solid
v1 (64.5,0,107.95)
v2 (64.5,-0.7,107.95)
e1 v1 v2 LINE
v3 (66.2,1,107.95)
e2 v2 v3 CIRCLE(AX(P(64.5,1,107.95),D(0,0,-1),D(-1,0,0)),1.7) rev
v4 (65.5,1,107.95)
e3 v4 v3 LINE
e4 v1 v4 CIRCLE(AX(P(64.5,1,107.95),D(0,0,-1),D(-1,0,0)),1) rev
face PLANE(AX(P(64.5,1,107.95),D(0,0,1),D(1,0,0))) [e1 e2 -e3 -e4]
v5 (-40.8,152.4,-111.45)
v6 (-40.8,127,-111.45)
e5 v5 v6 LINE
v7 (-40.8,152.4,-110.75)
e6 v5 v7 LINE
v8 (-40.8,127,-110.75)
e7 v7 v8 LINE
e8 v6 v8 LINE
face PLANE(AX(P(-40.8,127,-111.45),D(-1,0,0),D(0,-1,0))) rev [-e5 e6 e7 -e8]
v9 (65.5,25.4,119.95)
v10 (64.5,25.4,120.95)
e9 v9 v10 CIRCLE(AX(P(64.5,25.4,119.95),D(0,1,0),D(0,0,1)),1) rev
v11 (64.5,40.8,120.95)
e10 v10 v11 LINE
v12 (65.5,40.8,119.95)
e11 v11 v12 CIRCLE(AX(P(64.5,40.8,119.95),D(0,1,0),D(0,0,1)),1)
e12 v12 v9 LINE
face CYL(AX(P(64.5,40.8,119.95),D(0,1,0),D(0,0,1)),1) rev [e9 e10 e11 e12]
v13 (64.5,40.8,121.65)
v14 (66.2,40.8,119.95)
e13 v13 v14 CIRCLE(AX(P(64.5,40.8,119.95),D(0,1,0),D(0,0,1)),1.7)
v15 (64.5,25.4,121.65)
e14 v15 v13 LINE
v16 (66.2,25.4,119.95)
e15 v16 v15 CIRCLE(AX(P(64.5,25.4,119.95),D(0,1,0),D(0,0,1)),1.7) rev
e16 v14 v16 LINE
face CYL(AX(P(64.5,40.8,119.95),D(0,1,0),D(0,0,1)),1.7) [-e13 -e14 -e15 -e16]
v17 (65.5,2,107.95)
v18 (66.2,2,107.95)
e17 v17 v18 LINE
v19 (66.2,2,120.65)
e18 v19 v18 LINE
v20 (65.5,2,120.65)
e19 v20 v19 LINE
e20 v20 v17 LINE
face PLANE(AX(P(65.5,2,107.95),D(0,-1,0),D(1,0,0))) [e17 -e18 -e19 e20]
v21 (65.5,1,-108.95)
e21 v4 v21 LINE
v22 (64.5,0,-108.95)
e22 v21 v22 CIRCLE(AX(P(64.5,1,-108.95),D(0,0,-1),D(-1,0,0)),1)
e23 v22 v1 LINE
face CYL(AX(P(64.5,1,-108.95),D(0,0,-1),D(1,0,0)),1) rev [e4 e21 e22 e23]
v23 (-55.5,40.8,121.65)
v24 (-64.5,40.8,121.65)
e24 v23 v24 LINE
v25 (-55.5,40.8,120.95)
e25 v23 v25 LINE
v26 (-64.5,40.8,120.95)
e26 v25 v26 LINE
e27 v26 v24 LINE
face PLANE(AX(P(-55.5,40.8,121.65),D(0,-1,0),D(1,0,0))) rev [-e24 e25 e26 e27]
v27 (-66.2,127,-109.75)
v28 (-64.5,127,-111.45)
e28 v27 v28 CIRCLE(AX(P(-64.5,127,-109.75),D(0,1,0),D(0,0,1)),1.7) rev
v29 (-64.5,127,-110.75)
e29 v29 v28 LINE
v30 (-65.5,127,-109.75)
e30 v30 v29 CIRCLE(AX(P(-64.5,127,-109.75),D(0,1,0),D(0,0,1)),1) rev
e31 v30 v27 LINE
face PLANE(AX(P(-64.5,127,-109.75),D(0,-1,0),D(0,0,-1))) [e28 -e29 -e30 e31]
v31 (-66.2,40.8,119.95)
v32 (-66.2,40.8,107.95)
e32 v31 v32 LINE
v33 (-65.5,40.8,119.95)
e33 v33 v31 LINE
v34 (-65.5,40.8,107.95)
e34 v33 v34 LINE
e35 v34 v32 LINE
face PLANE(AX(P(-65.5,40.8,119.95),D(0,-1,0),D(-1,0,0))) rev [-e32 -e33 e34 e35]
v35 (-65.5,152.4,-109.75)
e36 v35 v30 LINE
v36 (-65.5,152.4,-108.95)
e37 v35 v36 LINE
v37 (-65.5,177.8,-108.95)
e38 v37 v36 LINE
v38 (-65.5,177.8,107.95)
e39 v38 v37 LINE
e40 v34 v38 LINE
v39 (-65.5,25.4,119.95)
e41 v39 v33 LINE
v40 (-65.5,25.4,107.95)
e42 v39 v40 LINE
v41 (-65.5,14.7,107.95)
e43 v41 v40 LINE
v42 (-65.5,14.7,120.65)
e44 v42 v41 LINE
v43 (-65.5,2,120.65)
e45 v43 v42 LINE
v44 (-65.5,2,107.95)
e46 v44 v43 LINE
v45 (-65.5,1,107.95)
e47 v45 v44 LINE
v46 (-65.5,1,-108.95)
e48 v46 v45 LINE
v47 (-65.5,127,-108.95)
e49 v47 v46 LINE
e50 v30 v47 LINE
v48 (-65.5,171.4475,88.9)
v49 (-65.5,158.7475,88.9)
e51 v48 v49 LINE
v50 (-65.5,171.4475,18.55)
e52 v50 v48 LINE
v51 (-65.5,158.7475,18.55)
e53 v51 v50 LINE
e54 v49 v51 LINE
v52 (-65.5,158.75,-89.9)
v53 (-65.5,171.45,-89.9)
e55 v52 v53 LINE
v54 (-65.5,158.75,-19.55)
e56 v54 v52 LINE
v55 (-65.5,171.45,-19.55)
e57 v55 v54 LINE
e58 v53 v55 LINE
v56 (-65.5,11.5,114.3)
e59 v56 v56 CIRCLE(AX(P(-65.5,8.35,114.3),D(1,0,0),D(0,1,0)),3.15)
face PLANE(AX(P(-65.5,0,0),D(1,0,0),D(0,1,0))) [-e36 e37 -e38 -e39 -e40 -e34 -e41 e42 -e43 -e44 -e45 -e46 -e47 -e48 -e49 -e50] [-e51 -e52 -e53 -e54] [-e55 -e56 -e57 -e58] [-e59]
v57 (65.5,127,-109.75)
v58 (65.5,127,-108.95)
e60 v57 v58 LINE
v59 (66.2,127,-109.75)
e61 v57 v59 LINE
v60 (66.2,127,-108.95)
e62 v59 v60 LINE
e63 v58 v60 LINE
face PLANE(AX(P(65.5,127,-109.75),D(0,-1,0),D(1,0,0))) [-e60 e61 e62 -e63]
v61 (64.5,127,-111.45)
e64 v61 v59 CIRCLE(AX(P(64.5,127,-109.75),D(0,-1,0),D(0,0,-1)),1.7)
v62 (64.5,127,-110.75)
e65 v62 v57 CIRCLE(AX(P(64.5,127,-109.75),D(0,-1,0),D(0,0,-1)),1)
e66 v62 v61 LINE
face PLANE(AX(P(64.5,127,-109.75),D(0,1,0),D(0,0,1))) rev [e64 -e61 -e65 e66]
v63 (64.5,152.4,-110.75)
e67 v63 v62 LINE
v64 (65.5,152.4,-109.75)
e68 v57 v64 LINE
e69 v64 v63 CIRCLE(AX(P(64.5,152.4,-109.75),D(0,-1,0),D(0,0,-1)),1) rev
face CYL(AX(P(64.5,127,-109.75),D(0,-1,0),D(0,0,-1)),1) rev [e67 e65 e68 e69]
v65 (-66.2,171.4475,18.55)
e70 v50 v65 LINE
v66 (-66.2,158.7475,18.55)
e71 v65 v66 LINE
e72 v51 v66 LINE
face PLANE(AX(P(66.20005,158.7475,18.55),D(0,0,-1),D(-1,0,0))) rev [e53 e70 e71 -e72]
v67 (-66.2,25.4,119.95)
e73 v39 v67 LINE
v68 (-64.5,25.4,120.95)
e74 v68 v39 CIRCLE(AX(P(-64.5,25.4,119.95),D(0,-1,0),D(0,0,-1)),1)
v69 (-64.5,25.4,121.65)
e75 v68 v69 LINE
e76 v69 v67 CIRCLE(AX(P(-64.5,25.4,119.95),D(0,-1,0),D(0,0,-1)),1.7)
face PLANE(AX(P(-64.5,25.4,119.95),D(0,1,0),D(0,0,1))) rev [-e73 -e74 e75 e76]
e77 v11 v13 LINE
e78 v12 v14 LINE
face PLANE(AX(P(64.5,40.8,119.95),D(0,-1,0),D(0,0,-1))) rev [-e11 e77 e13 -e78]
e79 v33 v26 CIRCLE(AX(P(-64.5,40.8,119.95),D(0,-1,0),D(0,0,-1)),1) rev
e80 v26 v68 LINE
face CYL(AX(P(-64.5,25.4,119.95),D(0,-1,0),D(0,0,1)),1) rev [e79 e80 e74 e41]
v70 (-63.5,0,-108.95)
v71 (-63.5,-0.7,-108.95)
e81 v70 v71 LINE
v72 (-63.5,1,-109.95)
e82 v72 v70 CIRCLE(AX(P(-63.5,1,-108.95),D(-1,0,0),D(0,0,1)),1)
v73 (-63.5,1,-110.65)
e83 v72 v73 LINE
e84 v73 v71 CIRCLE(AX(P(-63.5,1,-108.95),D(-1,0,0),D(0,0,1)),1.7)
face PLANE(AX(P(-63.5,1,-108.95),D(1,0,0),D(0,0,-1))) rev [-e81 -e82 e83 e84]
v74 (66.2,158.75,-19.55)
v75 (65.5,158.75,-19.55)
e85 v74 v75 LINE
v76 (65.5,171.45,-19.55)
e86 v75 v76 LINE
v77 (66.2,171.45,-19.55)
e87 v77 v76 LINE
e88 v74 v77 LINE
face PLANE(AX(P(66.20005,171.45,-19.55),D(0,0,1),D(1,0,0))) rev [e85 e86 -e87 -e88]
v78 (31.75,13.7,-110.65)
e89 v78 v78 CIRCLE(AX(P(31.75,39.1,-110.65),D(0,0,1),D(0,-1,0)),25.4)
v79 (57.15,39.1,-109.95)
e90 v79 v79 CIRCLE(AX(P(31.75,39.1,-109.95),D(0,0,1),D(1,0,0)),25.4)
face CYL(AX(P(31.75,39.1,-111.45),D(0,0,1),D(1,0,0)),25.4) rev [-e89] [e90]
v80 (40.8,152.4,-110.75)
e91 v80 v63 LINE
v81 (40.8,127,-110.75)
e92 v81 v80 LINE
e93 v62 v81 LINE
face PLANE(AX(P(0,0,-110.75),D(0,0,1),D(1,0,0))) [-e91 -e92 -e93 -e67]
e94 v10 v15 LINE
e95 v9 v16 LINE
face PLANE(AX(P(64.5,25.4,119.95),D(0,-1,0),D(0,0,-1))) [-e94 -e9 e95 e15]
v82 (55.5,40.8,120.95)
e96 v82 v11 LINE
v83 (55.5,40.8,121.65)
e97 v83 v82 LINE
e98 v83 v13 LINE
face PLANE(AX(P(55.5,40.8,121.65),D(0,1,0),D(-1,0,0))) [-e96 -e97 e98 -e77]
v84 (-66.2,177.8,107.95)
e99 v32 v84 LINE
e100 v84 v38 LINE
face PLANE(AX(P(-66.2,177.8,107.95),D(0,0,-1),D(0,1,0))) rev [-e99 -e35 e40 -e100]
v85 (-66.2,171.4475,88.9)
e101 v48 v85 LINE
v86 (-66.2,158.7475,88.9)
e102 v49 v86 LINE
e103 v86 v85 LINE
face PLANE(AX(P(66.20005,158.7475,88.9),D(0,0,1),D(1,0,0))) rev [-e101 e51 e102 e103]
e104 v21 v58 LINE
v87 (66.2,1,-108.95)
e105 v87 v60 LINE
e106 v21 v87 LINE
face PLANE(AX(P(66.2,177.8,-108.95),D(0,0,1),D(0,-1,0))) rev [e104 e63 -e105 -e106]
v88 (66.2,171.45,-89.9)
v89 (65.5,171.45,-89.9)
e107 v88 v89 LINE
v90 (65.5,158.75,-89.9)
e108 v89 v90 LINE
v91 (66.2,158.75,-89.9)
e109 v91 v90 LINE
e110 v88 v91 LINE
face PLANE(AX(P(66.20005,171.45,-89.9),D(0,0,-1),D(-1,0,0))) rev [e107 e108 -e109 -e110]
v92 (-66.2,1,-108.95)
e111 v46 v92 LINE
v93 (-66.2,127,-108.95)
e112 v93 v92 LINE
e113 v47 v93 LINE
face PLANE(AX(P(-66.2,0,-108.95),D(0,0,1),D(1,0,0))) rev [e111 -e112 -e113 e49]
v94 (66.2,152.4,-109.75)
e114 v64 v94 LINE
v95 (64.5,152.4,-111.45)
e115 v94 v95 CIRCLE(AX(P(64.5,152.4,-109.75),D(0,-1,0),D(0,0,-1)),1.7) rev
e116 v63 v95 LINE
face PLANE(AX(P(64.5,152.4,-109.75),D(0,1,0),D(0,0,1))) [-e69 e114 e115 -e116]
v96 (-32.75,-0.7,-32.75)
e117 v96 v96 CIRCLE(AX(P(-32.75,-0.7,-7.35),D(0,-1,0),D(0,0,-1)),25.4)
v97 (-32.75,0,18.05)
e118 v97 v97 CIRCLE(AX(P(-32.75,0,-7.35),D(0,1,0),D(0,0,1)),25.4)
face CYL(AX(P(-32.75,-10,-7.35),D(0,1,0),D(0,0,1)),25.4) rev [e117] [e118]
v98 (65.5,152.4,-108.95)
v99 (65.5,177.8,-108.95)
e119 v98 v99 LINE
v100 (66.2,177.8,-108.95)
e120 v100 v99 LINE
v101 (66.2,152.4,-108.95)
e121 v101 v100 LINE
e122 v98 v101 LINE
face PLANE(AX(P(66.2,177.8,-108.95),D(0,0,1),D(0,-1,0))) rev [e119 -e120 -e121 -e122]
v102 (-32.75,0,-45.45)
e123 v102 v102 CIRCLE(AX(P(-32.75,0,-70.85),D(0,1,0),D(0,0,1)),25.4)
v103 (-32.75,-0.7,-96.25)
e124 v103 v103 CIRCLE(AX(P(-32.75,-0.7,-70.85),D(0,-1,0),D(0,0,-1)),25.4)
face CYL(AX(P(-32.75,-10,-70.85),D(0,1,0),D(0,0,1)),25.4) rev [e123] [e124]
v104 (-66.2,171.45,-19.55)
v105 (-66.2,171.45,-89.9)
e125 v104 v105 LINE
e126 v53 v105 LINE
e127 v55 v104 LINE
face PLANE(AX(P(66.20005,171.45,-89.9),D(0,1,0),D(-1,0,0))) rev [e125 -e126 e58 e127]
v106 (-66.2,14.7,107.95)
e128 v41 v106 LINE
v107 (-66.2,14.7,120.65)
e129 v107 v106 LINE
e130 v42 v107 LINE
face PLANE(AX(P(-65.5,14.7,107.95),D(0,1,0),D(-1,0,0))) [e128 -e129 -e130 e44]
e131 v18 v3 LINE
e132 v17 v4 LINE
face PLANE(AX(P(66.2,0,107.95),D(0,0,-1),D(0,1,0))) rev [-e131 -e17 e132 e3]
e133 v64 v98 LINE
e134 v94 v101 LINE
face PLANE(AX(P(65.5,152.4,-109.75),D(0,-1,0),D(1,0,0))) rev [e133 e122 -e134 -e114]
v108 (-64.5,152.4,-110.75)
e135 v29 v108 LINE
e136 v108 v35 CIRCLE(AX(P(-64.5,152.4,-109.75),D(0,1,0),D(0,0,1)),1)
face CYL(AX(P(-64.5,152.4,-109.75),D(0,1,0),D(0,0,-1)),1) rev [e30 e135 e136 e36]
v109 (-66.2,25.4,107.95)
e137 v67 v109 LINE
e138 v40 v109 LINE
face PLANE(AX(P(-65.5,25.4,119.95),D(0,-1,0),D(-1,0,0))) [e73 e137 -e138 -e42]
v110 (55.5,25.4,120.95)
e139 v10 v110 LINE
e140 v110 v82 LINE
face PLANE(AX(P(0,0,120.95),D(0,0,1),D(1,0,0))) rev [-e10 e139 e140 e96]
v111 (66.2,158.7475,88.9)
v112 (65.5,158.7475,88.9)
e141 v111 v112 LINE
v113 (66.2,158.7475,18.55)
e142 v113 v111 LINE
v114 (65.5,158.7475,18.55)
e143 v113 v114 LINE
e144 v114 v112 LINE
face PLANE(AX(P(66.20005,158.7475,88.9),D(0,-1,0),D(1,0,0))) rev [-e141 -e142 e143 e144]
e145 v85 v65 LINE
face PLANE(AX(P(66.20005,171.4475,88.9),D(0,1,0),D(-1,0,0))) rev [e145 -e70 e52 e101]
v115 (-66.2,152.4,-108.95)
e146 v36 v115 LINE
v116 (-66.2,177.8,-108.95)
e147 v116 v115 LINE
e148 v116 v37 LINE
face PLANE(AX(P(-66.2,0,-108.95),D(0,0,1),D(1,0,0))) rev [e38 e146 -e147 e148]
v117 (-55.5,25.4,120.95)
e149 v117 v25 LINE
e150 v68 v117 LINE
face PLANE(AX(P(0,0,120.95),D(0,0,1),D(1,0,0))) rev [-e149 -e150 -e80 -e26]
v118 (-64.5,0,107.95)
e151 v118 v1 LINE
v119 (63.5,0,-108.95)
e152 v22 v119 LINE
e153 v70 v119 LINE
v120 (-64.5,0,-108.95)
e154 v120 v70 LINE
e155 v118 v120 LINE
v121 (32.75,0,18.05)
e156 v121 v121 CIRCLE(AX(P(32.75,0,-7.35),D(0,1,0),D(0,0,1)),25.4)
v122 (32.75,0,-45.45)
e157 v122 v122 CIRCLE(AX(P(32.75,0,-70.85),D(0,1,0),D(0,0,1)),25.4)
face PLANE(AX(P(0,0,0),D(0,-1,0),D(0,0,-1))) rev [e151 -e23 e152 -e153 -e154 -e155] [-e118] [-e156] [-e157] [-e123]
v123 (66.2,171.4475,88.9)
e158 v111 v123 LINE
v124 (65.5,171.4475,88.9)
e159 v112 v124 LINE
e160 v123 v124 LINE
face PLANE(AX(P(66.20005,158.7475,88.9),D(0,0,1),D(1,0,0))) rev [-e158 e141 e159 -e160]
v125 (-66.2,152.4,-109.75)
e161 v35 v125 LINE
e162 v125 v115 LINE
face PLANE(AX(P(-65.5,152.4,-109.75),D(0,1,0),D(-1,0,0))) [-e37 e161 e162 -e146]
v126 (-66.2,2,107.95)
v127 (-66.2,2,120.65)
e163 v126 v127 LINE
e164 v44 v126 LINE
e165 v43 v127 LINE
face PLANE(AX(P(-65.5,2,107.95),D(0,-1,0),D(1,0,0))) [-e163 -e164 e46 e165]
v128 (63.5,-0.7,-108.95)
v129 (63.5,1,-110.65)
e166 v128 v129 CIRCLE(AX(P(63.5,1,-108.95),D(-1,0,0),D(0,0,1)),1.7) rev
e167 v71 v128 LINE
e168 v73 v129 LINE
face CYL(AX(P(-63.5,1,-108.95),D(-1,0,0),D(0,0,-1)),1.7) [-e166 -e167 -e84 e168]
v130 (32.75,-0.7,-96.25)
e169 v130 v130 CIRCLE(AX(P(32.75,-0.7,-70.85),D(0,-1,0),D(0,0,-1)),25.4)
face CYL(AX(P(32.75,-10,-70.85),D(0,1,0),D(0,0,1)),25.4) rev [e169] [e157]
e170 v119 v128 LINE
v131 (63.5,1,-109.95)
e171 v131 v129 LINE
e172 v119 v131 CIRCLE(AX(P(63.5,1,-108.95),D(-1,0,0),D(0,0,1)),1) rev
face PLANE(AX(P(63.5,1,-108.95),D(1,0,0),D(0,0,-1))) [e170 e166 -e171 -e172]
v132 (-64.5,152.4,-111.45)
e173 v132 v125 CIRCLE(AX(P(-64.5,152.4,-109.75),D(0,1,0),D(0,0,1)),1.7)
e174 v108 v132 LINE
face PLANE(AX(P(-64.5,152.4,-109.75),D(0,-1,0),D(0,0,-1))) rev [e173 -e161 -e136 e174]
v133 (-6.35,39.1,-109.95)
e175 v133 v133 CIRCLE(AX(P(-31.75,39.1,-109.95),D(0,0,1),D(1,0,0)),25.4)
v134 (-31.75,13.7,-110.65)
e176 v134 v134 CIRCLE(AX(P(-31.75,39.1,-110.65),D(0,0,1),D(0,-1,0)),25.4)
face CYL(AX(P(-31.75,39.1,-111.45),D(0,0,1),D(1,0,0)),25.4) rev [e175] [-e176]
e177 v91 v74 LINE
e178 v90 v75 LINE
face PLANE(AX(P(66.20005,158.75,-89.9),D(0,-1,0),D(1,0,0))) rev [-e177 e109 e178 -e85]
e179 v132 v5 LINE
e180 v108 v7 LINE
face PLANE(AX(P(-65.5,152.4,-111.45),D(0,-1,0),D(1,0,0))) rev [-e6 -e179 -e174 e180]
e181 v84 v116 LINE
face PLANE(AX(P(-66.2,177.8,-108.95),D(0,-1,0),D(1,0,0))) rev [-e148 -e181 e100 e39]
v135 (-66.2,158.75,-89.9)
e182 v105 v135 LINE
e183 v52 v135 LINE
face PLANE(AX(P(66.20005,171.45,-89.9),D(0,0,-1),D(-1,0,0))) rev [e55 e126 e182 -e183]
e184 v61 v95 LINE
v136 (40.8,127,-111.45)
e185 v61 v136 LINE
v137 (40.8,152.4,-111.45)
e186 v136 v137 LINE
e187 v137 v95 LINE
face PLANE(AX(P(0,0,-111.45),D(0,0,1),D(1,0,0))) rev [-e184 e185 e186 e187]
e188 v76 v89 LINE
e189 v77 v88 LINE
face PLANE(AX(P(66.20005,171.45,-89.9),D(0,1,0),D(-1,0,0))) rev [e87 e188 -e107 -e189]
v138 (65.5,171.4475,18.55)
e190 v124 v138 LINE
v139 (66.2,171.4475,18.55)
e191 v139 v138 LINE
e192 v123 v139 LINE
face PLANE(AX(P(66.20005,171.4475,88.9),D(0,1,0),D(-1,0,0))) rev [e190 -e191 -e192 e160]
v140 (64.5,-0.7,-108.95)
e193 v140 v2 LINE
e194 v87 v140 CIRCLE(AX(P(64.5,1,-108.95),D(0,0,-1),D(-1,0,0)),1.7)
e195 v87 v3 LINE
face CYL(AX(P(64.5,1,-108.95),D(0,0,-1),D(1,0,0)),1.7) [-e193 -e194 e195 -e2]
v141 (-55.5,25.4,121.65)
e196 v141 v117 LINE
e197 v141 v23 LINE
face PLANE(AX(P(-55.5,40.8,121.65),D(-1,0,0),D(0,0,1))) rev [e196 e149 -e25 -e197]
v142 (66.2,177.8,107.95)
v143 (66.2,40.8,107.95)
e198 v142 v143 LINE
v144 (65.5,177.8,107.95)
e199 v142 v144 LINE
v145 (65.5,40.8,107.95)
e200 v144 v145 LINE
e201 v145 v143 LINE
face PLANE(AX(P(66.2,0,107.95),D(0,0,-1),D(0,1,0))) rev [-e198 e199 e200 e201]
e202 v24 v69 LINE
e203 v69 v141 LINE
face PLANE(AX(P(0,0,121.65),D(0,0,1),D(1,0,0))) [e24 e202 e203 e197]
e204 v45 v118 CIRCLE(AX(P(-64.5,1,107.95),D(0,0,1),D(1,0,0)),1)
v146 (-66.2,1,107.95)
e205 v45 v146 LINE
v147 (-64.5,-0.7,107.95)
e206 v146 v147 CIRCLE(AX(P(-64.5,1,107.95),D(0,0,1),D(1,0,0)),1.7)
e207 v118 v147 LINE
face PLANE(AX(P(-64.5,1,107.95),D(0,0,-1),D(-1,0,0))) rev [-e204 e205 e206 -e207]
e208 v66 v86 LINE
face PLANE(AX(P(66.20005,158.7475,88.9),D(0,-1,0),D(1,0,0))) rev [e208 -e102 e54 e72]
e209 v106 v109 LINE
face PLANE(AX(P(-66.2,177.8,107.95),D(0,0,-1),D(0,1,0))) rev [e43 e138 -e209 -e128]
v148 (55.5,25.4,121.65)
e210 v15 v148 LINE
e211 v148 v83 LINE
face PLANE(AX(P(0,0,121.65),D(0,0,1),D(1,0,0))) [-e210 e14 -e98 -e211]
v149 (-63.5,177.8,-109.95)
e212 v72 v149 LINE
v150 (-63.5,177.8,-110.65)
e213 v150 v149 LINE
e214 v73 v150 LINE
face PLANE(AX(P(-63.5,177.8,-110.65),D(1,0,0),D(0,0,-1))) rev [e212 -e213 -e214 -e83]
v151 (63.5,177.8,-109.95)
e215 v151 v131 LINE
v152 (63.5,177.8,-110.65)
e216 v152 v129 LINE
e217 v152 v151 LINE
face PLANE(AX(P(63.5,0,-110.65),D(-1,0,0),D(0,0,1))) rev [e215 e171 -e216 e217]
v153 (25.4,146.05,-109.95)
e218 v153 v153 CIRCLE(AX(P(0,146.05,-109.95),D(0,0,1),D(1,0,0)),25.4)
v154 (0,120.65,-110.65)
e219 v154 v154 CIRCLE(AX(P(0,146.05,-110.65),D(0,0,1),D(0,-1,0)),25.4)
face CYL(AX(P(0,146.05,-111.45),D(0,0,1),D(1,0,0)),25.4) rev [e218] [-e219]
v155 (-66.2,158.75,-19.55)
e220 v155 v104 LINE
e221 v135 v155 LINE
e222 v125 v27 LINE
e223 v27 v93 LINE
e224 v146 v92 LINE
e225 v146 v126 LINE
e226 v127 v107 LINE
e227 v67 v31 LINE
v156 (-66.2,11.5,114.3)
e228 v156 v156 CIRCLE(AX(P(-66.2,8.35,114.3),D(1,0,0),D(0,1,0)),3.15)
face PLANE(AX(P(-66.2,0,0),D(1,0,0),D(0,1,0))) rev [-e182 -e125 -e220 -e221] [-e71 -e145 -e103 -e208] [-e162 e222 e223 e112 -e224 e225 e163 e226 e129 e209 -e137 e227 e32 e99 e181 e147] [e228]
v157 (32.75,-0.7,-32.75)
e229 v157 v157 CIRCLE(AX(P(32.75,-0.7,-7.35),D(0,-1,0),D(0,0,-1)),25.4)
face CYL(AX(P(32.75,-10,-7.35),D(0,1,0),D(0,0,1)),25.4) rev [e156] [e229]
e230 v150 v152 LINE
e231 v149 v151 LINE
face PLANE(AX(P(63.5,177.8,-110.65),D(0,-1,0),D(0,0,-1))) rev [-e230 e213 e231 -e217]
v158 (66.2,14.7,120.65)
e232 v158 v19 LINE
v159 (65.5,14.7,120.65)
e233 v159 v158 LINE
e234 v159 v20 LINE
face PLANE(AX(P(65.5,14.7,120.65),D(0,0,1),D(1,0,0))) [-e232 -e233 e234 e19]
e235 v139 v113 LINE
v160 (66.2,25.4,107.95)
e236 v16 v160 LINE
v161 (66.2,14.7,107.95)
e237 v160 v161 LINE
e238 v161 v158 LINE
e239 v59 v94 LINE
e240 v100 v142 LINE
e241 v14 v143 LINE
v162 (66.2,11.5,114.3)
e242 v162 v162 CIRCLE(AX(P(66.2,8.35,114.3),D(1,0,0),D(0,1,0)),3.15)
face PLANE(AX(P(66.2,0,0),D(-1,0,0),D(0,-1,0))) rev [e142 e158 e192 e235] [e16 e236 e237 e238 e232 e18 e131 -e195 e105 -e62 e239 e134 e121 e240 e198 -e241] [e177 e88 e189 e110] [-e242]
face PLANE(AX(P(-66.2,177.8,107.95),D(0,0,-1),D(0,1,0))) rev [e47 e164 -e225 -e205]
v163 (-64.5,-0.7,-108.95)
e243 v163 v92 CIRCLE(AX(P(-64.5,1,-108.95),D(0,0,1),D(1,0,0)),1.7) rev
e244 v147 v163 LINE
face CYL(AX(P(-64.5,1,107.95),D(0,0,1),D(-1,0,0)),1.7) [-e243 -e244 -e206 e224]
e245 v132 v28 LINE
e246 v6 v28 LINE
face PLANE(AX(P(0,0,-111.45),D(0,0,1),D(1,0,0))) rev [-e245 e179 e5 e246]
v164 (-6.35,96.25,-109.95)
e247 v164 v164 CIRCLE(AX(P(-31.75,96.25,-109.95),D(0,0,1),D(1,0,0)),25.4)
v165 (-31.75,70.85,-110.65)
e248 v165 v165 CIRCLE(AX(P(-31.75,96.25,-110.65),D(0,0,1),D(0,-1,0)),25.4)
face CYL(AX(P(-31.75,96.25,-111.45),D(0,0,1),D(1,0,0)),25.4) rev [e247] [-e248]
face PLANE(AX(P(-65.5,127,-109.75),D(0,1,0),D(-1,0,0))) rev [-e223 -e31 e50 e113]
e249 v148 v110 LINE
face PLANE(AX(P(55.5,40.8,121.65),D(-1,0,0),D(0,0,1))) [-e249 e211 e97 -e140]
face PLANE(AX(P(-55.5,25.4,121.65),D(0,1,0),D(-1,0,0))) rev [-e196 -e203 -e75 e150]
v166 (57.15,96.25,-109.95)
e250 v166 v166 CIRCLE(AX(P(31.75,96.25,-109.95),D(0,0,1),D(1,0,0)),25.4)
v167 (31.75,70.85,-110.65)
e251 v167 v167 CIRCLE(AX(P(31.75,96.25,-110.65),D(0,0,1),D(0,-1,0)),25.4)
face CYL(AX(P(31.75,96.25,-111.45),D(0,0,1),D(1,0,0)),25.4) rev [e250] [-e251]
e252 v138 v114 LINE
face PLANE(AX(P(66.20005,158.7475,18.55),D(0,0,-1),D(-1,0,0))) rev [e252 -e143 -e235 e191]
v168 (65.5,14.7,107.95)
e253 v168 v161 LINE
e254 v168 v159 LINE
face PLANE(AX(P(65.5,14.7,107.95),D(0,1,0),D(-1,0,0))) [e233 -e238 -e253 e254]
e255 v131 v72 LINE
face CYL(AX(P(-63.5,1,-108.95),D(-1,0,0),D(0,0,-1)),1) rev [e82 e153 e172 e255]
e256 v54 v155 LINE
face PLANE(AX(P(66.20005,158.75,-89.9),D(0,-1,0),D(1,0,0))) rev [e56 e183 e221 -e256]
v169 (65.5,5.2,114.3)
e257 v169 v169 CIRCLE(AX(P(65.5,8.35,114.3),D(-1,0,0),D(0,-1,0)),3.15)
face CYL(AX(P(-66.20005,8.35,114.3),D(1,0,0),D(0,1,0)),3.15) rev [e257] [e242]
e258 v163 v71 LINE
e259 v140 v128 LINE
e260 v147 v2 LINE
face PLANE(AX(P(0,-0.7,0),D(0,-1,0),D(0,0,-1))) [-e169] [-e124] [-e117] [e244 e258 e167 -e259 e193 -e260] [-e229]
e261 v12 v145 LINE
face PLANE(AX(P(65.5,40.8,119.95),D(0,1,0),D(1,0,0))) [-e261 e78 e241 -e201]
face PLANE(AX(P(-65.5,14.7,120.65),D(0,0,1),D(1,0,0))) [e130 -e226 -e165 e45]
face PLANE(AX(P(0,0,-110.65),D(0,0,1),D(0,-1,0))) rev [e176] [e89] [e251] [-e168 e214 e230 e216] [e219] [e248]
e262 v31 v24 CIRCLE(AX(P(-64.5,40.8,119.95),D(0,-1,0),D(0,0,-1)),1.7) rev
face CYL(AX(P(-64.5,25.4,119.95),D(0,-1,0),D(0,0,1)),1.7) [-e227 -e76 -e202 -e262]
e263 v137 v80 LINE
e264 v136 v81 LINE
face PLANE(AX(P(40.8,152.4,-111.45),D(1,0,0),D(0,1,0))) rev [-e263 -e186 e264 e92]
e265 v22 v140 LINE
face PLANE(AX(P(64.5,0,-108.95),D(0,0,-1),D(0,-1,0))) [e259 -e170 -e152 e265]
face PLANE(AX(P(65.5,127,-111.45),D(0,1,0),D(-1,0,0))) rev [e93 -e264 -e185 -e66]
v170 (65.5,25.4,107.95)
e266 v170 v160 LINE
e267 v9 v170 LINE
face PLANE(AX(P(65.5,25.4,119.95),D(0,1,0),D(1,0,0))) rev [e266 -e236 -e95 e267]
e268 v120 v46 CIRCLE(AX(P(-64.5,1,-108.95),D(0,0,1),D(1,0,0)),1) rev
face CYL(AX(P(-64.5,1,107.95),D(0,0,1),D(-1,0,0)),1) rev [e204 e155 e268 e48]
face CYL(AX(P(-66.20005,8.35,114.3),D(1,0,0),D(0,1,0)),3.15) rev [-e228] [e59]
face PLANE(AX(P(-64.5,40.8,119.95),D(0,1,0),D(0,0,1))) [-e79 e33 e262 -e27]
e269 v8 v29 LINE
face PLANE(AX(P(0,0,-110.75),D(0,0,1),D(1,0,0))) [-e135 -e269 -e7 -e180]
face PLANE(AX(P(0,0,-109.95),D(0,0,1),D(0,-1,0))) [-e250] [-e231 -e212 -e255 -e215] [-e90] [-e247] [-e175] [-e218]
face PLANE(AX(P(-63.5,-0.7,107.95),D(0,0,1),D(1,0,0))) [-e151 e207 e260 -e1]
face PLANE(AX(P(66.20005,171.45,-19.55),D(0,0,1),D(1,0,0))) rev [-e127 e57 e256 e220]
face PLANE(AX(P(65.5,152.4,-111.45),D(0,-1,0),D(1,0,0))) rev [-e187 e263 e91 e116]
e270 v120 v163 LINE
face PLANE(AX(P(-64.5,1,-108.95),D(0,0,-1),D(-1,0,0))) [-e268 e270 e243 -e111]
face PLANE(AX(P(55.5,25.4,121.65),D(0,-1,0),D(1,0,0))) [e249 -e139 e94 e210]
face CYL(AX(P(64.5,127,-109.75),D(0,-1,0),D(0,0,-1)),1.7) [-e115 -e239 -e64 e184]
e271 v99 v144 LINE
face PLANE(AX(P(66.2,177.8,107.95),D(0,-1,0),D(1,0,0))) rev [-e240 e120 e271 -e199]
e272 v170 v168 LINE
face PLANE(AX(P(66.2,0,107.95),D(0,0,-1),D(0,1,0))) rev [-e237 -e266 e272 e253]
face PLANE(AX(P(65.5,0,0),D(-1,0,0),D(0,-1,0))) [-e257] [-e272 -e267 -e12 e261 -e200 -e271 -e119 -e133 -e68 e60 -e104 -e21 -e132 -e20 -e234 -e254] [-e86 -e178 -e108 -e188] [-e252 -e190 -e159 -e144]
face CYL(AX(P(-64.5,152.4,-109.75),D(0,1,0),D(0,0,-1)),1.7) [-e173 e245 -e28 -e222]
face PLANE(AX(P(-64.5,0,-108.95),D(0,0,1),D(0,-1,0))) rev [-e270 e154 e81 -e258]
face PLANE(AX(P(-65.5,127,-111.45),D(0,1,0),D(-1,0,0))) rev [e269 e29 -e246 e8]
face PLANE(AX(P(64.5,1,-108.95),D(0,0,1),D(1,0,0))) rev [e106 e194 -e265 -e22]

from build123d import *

# Parameters (mm, degrees)
SKETCH2_W           = 127
SKETCH2_H           = 215.9
BASE_FLANGE1_DEPTH  = 0.7
EDGE_FLANGE4_DEPTH  = 127
EDGE_FLANGE5_DEPTH  = 216.9
EDGE_FLANGE6_DEPTH  = 216.9
EDGE_FLANGE7_DEPTH  = 25.4
EDGE_FLANGE9_DEPTH  = 25.4
EDGE_FLANGE10_DEPTH = 15.4
EDGE_FLANGE11_DEPTH = 15.4
SKETCH76_W          = 12.7
SKETCH76_H          = 12.7
TAB1_DEPTH          = 0.7
SKETCH79_W          = 12.7
SKETCH79_H          = 12.7
TAB2_DEPTH          = 0.7
SKETCH86_R          = 3.15
CUT_EXTRUDE3_DEPTH  = 253.866214627
SKETCH87_W          = 70.35
SKETCH87_H          = 12.7
CUT_EXTRUDE4_DEPTH  = 253.866214627
SKETCH88_R          = 25.4
CUT_EXTRUDE5_DEPTH  = 10
SKETCH90_R          = 25.4
CUT_EXTRUDE6_DEPTH  = 300.389111358


# Sheet-metal steps are written as plain solids
with BuildPart() as part:
    # Sketch2 → Base-Flange1 (new body)
    with BuildSketch(Plane(origin=(0, 0, 0), x_dir=(1, 0, 0), z_dir=(0, 1, 0))):
        Rectangle(SKETCH2_W, SKETCH2_H)
    extrude(amount=-BASE_FLANGE1_DEPTH)

    # Edge-Flange4 section (across the edge) → Edge-Flange4 (add)
    with BuildSketch(Plane(origin=(63.5, 0, -109.95), x_dir=(0, 0, 1), z_dir=(-1, 0, 0))):
        with BuildLine():
            Line((-0.7, 1), (-0.7, 177.8))
            Line((-0.7, 177.8), (0, 177.8))
            Line((0, 177.8), (0, 1))
            ThreePointArc((0, 1), (0.292893219, 0.292893219), (1, 0))
            Line((1, 0), (2, 0))
            Line((2, 0), (2, -0.7))
            Line((2, -0.7), (1, -0.7))
            ThreePointArc((1, -0.7), (-0.202081528, -0.202081528), (-0.7, 1))
        make_face()
    extrude(amount=EDGE_FLANGE4_DEPTH)

    # Edge-Flange5 section (across the edge) → Edge-Flange5 (add)
    with BuildSketch(Plane(origin=(-65.5, 0, -108.95), x_dir=(1, 0, 0), z_dir=(0, 0, 1))):
        with BuildLine():
            Line((-0.7, 1), (-0.7, 177.8))
            Line((-0.7, 177.8), (0, 177.8))
            Line((0, 177.8), (0, 1))
            ThreePointArc((0, 1), (0.292893219, 0.292893219), (1, 0))
            Line((1, 0), (2, 0))
            Line((2, 0), (2, -0.7))
            Line((2, -0.7), (1, -0.7))
            ThreePointArc((1, -0.7), (-0.202081528, -0.202081528), (-0.7, 1))
        make_face()
    extrude(amount=EDGE_FLANGE5_DEPTH)

    # Edge-Flange6 section (across the edge) → Edge-Flange6 (add)
    with BuildSketch(Plane(origin=(65.5, 0, 107.95), x_dir=(-1, 0, 0), z_dir=(0, 0, -1))):
        with BuildLine():
            Line((-0.7, 1), (-0.7, 177.8))
            Line((-0.7, 177.8), (0, 177.8))
            Line((0, 177.8), (0, 1))
            ThreePointArc((0, 1), (0.292893219, 0.292893219), (1, 0))
            Line((1, 0), (2, 0))
            Line((2, 0), (2, -0.7))
            Line((2, -0.7), (1, -0.7))
            ThreePointArc((1, -0.7), (-0.202081528, -0.202081528), (-0.7, 1))
        make_face()
    extrude(amount=EDGE_FLANGE6_DEPTH)

    # Edge-Flange7 section (across the edge) → Edge-Flange7 (add)
    with BuildSketch(Plane(origin=(-65.5, 127, -110.75), x_dir=(0, 0, 1), z_dir=(0, 1, 0))):
        with BuildLine():
            Line((-0.7, 1), (-0.7, 24.7))
            Line((-0.7, 24.7), (0, 24.7))
            Line((0, 24.7), (0, 1))
            ThreePointArc((0, 1), (0.292893219, 0.292893219), (1, 0))
            Line((1, 0), (1.8, 0))
            Line((1.8, 0), (1.8, -0.7))
            Line((1.8, -0.7), (1, -0.7))
            ThreePointArc((1, -0.7), (-0.202081528, -0.202081528), (-0.7, 1))
        make_face()
    extrude(amount=EDGE_FLANGE7_DEPTH)

    # Edge-Flange9 section (across the edge) → Edge-Flange9 (add)
    with BuildSketch(Plane(origin=(65.5, 152.4, -110.75), x_dir=(0, 0, 1), z_dir=(0, -1, 0))):
        with BuildLine():
            Line((-0.7, 1), (-0.7, 24.7))
            Line((-0.7, 24.7), (0, 24.7))
            Line((0, 24.7), (0, 1))
            ThreePointArc((0, 1), (0.292893219, 0.292893219), (1, 0))
            Line((1, 0), (1.8, 0))
            Line((1.8, 0), (1.8, -0.7))
            Line((1.8, -0.7), (1, -0.7))
            ThreePointArc((1, -0.7), (-0.202081528, -0.202081528), (-0.7, 1))
        make_face()
    extrude(amount=EDGE_FLANGE9_DEPTH)

    # Edge-Flange10 section (across the edge) → Edge-Flange10 (add)
    with BuildSketch(Plane(origin=(65.5, 25.4, 120.95), x_dir=(0, 0, -1), z_dir=(0, 1, 0))):
        with BuildLine():
            Line((-0.7, 1), (-0.7, 10))
            Line((-0.7, 10), (0, 10))
            Line((0, 10), (0, 1))
            ThreePointArc((0, 1), (0.292893219, 0.292893219), (1, 0))
            Line((1, 0), (13, 0))
            Line((13, 0), (13, -0.7))
            Line((13, -0.7), (1, -0.7))
            ThreePointArc((1, -0.7), (-0.202081528, -0.202081528), (-0.7, 1))
        make_face()
    extrude(amount=EDGE_FLANGE10_DEPTH)

    # Edge-Flange11 section (across the edge) → Edge-Flange11 (add)
    with BuildSketch(Plane(origin=(-65.5, 40.8, 120.95), x_dir=(0, 0, -1), z_dir=(0, -1, 0))):
        with BuildLine():
            Line((-0.7, 1), (-0.7, 10))
            Line((-0.7, 10), (0, 10))
            Line((0, 10), (0, 1))
            ThreePointArc((0, 1), (0.292893219, 0.292893219), (1, 0))
            Line((1, 0), (13, 0))
            Line((13, 0), (13, -0.7))
            Line((13, -0.7), (1, -0.7))
            ThreePointArc((1, -0.7), (-0.202081528, -0.202081528), (-0.7, 1))
        make_face()
    extrude(amount=EDGE_FLANGE11_DEPTH)

    # Sketch76 → Tab1 (add)
    with BuildSketch(Plane.ZY.offset(66.2)):
        with Locations((114.3, 8.35)):
            Rectangle(SKETCH76_W, SKETCH76_H)
    extrude(amount=-TAB1_DEPTH)

    # Sketch79 → Tab2 (add)
    with BuildSketch(Plane(origin=(66.2, 0, 0), x_dir=(0, 0, -1), z_dir=(1, 0, 0))):
        with Locations((-114.3, 8.35)):
            Rectangle(SKETCH79_W, SKETCH79_H)
    extrude(amount=-TAB2_DEPTH)

    # Sketch86 → Cut-Extrude3 (cut, through all)
    with BuildSketch(Plane(origin=(66.2, 0, 0), x_dir=(0, 0, -1), z_dir=(1, 0, 0))):
        with Locations(Location((-114.3, 8.35, 0), (0, 0, 90))):
            Circle(SKETCH86_R)
    extrude(amount=-CUT_EXTRUDE3_DEPTH, mode=Mode.SUBTRACT)

    # Sketch87 → Cut-Extrude4 (cut, through all)
    with BuildSketch(Plane.ZY.offset(66.2)):
        with Locations((-54.725, 165.1)):
            Rectangle(SKETCH87_W, SKETCH87_H)
        with Locations((53.725, 165.0975)):
            Rectangle(SKETCH87_W, SKETCH87_H)
    extrude(amount=-CUT_EXTRUDE4_DEPTH, mode=Mode.SUBTRACT)

    # Sketch88 → Cut-Extrude5 (cut)
    with BuildSketch(Plane(origin=(0, 0, 0), x_dir=(1, 0, 0), z_dir=(0, 1, 0))):
        with Locations(Location((-32.75, 70.85, 0), (0, 0, 270))):
            Circle(SKETCH88_R)
        with Locations(Location((32.75, 70.85, 0), (0, 0, 270))):
            Circle(SKETCH88_R)
        with Locations(Location((-32.75, 7.35, 0), (0, 0, 270))):
            Circle(SKETCH88_R)
        with Locations(Location((32.75, 7.35, 0), (0, 0, 270))):
            Circle(SKETCH88_R)
    extrude(amount=-CUT_EXTRUDE5_DEPTH, mode=Mode.SUBTRACT)

    # Sketch90 → Cut-Extrude6 (cut, through all)
    with BuildSketch(Plane.XY.offset(-109.95)):
        with Locations((-31.75, 39.1)):
            Circle(SKETCH90_R)
        with Locations((31.75, 39.1)):
            Circle(SKETCH90_R)
        with Locations((-31.75, 96.25)):
            Circle(SKETCH90_R)
        with Locations((31.75, 96.25)):
            Circle(SKETCH90_R)
        with Locations((0, 146.05)):
            Circle(SKETCH90_R)
    extrude(amount=-CUT_EXTRUDE6_DEPTH, mode=Mode.SUBTRACT)


solid = part.part
